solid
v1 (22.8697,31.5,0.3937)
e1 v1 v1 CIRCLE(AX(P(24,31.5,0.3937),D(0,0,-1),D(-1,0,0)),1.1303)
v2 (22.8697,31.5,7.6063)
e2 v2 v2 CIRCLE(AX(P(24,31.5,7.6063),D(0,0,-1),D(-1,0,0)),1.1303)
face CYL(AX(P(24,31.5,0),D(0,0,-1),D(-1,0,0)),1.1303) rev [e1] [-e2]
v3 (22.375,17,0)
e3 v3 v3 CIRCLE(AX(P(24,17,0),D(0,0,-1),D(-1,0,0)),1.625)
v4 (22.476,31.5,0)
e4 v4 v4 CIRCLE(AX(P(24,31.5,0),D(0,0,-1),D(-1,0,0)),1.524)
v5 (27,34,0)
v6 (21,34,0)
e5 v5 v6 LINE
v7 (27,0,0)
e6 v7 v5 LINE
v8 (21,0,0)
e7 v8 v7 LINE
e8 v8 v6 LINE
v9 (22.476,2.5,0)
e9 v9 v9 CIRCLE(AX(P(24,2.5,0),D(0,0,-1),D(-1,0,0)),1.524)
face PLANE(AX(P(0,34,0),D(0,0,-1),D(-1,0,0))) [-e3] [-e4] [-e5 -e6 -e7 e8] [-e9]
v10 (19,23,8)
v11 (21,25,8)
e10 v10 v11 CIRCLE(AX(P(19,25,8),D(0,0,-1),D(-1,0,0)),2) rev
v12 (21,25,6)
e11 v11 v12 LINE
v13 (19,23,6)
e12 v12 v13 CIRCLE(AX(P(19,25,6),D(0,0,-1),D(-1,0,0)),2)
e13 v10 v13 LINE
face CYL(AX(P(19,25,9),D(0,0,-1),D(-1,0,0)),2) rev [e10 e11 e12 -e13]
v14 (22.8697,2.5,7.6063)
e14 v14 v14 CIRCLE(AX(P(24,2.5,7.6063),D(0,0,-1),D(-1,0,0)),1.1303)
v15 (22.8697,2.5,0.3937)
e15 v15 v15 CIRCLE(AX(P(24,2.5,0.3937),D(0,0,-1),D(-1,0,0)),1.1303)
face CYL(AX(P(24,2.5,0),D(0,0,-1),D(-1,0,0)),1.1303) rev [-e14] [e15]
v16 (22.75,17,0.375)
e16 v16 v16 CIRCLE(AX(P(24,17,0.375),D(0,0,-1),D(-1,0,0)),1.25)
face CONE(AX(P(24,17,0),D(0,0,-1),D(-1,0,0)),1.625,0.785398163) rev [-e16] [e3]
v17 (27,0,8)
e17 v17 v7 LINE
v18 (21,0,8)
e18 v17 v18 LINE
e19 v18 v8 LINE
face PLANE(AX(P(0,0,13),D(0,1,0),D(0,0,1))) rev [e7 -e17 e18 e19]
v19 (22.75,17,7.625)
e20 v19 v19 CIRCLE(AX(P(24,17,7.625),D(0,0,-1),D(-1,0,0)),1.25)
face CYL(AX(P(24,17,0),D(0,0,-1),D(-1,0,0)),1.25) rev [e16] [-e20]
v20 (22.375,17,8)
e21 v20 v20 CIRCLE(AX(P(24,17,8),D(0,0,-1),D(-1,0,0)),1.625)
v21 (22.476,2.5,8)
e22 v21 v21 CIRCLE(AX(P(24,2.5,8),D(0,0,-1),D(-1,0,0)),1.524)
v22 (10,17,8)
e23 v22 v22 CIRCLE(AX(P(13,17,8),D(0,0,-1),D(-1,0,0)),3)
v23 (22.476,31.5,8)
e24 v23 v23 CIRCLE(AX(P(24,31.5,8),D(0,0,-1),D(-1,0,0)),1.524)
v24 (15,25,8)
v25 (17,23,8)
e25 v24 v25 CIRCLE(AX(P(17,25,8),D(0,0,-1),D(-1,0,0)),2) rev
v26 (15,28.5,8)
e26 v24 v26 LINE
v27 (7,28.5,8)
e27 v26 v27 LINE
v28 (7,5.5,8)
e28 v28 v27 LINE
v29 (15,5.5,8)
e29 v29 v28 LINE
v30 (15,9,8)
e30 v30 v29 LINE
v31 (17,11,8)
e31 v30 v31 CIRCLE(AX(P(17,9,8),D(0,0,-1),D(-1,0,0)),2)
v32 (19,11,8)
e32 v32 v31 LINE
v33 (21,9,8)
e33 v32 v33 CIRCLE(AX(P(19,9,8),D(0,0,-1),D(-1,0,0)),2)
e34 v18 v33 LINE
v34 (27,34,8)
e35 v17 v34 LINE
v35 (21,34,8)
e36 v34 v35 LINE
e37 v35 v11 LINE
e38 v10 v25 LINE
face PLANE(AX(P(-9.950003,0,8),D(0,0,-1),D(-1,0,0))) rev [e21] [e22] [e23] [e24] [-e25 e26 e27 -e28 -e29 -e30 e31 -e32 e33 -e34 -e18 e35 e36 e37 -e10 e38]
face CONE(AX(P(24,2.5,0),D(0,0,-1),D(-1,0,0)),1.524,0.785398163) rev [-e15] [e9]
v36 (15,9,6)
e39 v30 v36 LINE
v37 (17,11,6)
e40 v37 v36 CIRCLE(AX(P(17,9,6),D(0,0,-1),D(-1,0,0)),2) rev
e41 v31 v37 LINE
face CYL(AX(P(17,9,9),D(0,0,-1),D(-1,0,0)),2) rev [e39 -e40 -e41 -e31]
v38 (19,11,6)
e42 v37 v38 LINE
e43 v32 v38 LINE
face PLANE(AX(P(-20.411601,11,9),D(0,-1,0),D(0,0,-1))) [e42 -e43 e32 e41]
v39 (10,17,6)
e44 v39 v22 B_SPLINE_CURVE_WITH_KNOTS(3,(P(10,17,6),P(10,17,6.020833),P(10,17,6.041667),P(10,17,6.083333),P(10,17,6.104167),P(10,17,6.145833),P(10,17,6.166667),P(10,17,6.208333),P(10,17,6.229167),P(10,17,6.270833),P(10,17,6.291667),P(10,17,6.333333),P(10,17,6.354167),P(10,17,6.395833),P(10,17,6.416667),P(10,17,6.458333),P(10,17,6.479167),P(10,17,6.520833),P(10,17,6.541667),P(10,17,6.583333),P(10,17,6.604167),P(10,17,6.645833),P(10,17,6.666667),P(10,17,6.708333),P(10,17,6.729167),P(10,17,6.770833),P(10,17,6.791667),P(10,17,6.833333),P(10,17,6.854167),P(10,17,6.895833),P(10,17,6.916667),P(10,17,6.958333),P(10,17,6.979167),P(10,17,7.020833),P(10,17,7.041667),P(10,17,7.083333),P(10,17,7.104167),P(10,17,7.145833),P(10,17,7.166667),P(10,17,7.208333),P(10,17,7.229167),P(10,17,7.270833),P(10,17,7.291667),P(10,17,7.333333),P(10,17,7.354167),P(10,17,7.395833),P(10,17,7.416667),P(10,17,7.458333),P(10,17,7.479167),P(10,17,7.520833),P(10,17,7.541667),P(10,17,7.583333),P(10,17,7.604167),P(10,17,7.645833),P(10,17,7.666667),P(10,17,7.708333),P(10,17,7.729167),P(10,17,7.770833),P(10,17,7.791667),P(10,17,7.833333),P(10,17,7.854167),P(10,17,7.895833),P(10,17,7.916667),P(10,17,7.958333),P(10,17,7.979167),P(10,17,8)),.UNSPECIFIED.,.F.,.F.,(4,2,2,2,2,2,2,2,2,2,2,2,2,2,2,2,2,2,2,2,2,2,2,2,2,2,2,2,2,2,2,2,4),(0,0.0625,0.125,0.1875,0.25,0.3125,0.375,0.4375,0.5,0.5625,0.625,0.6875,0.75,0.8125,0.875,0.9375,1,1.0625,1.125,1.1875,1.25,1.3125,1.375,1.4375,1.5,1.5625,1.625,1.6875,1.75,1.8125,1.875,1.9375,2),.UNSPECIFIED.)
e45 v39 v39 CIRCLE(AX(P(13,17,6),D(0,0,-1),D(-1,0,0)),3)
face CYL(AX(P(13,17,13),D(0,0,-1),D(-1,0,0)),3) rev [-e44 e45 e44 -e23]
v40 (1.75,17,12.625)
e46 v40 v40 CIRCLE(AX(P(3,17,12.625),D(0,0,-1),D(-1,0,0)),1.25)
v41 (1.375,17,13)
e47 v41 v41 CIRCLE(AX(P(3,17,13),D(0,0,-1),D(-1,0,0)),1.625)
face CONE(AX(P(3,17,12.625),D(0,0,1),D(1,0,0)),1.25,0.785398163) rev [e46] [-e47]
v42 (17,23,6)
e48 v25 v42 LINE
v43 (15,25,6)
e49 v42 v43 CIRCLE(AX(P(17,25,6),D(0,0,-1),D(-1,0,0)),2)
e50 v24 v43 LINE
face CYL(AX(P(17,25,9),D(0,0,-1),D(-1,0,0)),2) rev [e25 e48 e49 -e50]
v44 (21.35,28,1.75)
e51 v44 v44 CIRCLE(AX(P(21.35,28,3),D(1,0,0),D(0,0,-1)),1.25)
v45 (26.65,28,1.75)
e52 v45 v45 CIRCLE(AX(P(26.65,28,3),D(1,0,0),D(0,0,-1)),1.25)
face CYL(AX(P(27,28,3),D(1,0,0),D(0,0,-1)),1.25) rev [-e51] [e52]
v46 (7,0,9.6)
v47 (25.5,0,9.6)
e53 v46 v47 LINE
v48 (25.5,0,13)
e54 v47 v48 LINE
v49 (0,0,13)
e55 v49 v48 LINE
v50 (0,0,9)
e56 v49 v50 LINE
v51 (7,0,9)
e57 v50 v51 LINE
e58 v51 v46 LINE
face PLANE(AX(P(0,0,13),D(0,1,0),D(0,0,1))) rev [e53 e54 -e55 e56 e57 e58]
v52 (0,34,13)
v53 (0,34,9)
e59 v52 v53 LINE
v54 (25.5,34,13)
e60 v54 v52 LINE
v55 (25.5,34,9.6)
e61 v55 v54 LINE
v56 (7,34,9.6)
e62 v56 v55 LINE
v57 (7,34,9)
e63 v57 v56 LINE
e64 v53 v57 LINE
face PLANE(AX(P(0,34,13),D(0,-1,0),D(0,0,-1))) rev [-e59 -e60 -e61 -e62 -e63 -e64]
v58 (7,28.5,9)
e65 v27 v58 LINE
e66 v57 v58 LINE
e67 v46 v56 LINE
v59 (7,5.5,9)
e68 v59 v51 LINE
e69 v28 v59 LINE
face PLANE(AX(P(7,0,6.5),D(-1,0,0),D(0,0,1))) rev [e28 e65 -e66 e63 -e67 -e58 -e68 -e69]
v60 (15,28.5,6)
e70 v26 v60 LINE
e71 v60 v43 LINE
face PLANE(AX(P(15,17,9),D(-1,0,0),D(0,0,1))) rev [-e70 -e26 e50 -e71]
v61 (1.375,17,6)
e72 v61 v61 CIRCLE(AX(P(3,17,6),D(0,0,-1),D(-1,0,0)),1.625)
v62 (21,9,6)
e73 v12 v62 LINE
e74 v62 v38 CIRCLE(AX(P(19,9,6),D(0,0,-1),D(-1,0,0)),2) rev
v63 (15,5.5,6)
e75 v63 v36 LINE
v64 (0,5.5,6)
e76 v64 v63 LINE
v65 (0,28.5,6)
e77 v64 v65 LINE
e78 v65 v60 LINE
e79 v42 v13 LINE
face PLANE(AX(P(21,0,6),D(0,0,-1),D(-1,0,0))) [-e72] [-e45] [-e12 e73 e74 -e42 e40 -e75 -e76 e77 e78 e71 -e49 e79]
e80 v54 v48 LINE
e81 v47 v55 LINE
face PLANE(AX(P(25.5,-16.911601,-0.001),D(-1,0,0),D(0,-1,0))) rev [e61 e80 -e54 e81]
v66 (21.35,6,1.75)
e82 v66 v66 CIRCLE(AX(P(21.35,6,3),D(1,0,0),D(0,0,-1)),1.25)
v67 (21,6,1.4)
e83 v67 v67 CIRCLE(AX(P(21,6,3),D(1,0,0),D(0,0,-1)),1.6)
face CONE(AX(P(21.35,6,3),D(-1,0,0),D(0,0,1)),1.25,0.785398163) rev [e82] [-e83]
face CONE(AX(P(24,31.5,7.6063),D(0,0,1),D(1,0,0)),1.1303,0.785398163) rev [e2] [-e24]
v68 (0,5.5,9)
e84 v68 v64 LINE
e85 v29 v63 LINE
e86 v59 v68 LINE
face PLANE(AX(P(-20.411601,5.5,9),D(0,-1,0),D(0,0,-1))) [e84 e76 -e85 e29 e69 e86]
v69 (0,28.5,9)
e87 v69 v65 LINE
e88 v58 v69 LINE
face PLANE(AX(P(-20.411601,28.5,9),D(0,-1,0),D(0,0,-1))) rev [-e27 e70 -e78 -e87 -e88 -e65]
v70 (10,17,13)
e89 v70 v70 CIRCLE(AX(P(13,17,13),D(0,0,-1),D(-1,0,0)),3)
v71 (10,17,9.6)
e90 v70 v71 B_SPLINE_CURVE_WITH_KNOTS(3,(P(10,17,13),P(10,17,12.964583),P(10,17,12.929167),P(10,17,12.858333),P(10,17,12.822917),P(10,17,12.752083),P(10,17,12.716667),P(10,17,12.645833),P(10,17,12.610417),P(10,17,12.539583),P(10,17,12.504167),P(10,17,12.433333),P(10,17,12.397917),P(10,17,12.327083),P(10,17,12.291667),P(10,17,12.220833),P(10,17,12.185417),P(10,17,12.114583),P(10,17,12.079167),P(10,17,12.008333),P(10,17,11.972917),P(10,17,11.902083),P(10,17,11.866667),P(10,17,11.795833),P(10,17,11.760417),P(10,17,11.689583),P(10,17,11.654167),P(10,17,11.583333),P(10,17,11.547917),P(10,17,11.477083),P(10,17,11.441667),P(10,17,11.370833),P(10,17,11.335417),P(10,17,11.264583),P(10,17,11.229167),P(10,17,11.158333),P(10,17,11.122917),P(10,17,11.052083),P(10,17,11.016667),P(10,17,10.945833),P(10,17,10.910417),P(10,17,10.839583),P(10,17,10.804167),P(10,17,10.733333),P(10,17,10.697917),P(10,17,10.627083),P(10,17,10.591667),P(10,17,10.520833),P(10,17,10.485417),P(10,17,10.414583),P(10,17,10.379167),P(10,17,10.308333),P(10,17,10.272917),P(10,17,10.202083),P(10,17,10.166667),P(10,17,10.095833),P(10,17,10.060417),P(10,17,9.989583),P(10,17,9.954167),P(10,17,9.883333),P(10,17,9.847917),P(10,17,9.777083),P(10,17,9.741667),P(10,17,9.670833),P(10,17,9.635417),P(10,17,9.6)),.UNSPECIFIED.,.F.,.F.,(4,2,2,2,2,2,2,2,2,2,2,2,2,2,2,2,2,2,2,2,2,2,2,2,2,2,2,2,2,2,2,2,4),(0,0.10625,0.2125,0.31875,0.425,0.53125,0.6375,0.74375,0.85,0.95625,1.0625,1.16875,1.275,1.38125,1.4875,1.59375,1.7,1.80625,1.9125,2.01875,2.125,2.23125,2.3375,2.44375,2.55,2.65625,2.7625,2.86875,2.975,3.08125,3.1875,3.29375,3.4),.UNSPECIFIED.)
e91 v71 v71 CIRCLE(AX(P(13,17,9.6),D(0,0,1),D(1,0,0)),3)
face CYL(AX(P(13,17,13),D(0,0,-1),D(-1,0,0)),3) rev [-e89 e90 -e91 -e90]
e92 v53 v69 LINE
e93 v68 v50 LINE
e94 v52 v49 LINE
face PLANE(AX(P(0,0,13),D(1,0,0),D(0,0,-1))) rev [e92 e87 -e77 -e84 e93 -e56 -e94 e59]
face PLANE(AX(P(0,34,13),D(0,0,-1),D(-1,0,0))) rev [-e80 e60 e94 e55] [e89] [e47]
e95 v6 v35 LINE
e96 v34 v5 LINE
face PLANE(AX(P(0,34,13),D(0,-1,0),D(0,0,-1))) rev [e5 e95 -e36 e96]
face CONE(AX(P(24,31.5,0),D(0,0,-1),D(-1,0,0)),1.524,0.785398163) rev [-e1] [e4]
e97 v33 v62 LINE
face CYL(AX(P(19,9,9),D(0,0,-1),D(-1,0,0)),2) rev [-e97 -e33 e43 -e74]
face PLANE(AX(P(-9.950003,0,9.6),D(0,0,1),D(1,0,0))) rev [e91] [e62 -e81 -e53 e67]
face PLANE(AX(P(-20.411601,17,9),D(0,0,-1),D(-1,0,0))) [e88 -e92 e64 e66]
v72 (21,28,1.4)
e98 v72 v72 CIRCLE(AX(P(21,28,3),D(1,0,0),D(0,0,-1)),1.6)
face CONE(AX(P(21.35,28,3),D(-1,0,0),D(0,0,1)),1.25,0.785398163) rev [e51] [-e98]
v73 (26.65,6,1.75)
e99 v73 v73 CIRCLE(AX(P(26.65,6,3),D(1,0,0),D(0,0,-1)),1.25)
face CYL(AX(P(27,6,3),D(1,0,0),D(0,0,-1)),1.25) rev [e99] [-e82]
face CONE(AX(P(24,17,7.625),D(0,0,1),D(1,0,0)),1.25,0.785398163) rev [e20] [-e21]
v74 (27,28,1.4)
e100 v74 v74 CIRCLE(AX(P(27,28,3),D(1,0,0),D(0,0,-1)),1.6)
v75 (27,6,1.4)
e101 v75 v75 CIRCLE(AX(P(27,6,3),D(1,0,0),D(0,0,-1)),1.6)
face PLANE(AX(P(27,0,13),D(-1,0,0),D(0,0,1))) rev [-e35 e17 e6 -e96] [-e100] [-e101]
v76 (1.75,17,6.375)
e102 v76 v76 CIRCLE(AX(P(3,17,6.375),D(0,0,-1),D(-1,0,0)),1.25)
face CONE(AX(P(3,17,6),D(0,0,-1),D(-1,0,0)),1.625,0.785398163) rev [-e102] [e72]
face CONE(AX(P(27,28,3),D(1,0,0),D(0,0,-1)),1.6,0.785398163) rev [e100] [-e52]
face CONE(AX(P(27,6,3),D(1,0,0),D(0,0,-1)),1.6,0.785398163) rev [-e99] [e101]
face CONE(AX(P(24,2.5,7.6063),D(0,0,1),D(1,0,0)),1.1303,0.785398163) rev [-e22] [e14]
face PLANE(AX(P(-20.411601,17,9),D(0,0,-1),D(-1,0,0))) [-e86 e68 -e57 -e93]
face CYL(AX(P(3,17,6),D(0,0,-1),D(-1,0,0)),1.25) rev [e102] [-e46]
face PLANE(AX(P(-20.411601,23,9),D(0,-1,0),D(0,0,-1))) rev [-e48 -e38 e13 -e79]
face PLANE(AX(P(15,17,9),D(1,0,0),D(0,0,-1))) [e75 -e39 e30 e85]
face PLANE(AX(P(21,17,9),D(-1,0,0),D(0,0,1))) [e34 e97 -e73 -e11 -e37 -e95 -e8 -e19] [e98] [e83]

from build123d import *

# Parameters (mm, degrees)
SKETCH_1_W                   = 27
SKETCH_1_H                   = 34
EXTRUDE_1_DEPTH              = 13
SKETCH_2_W                   = 20
SKETCH_2_H                   = 1.6
CUT_EXTRUDE_1_DEPTH          = 46.321076774
CUT_EXTRUDE_2_DEPTH          = 9
CUT_EXTRUDE_3_REACH          = 47.321
SKETCH_4_W                   = 1.5
SKETCH_4_H                   = 34
SKETCH_12_W                  = 21
SKETCH_12_H                  = 34
CUT_EXTRUDE_7_DEPTH          = 6
SKETCH_8_R                   = 3
CUT_EXTRUDE_4_DEPTH          = 46.321076774
HOLE_WIZARD_M31_AT_2_COUNT   = 2
HOLE_WIZARD_M31_AT_2_PITCH   = 22
HOLE_WIZARD_4_401_AT_2_COUNT = 2
HOLE_WIZARD_4_401_AT_2_PITCH = 29


# Read off the part's stored shape, not the designer's step: Отверстие обработанное метчиком M3x0.52
with BuildPart() as part:
    # Эскиз1 → Вытянуть1 (new body)
    with BuildSketch(Plane.XY):
        with Locations((13.5, 17)):
            Rectangle(SKETCH_1_W, SKETCH_1_H)
    extrude(amount=EXTRUDE_1_DEPTH)

    # Эскиз2 → Вырез-Вытянуть1 (cut, through all)
    with BuildSketch(Plane(origin=(0, 34, 0), x_dir=(1, 0, 0), z_dir=(0, 1, 0))):
        with Locations((17, -8.8)):
            Rectangle(SKETCH_2_W, SKETCH_2_H)
    extrude(amount=-CUT_EXTRUDE_1_DEPTH, mode=Mode.SUBTRACT)

    # Эскиз3 → Вырез-Вытянуть2 (cut)
    with BuildSketch(Plane(origin=(0, 0, 0), x_dir=(-1, 0, 0), z_dir=(0, 0, -1))):
        with BuildLine():
            Line((0, 34), (-21, 34))
            Line((-21, 34), (-21, 25))
            ThreePointArc((-21, 25), (-20.414213562, 23.585786438), (-19, 23))
            Line((-19, 23), (-17, 23))
            ThreePointArc((-17, 23), (-15.585786438, 23.585786438), (-15, 25))
            Line((-15, 25), (-15, 28.5))
            Line((-15, 28.5), (0, 28.5))
            Line((0, 28.5), (0, 34))
        make_face()
        with BuildLine():
            Line((0, 0), (0, 5.5))
            Line((0, 5.5), (-15, 5.5))
            Line((-15, 5.5), (-15, 9))
            ThreePointArc((-15, 9), (-15.585786438, 10.414213562), (-17, 11))
            Line((-17, 11), (-19, 11))
            ThreePointArc((-19, 11), (-20.414213562, 10.414213562), (-21, 9))
            Line((-21, 9), (-21, 0))
            Line((-21, 0), (0, 0))
        make_face()
    extrude(amount=-CUT_EXTRUDE_2_DEPTH, mode=Mode.SUBTRACT)

    # Эскиз4 → Вырез-Вытянуть3 (cut, up to next)
    with BuildSketch(Plane.XY.offset(13), mode=Mode.PRIVATE) as cut_extrude_3_sk1:
        with Locations((26.25, 17)):
            Rectangle(SKETCH_4_W, SKETCH_4_H)
    cut_extrude_3_tool1 = extrude(cut_extrude_3_sk1.sketch, amount=-CUT_EXTRUDE_3_REACH, mode=Mode.PRIVATE) & part.part
    add(cut_extrude_3_tool1.solids().sort_by_distance((26.25, 17, 13))[0], mode=Mode.SUBTRACT)

    # Эскиз12 → Вырез-Вытянуть7 (cut)
    with BuildSketch(Plane(origin=(0, 0, 0), x_dir=(-1, 0, 0), z_dir=(0, 0, -1))):
        with Locations((-10.5, 17)):
            Rectangle(SKETCH_12_W, SKETCH_12_H)
    extrude(amount=-CUT_EXTRUDE_7_DEPTH, mode=Mode.SUBTRACT)

    # Эскиз8 → Вырез-Вытянуть4 (cut, through all)
    with BuildSketch(Plane(origin=(0, 0, 0), x_dir=(-1, 0, 0), z_dir=(0, 0, -1))):
        with Locations((-13, 17)):
            Circle(SKETCH_8_R)
    extrude(amount=-CUT_EXTRUDE_4_DEPTH, mode=Mode.SUBTRACT)

    # Эскиз19 → Отверстие обработанное метчиком M31 (revolve, cut)
    with BuildSketch(Plane(origin=(27, 28, 3), x_dir=(0, 0, -1), z_dir=(0, 1, 0))):
        Polygon((0, 0), (0, 6), (1.6, 6), (1.25, 5.65), (1.25, 0.35), (1.6, 0), align=None)
    hole_wizard_m31 = revolve(axis=Axis((33.35, 28, 3), (-1, 0, 0)), mode=Mode.SUBTRACT)

    # Отверстие обработанное метчиком M31 at 2: Отверстие обработанное метчиком M31 ×2
    with Locations(*[(0, -i * HOLE_WIZARD_M31_AT_2_PITCH, 0) for i in range(1, HOLE_WIZARD_M31_AT_2_COUNT)]):
        add(hole_wizard_m31, mode=Mode.SUBTRACT)

    # Отверстие обработанное метчиком M3x0.52 outline → Отверстие обработанное метчиком M3x0.52 (revolve, cut)
    with BuildSketch(Plane(origin=(24, 17, 0), x_dir=(1, 0, 0), z_dir=(0, -1, 0))):
        Polygon((1.625, 8), (0, 8), (0, 0), (1.625, 0), (1.25, 0.375), (1.25, 7.625), align=None)
    revolve(axis=Axis((24, 17, 0), (0, 0, 1)), mode=Mode.SUBTRACT)

    # M3x0.52 2 outline → M3x0.52 2 (revolve, cut)
    with BuildSketch(Plane(origin=(3, 17, 0), x_dir=(1, 0, 0), z_dir=(0, -1, 0))):
        Polygon((1.625, 13), (0, 13), (0, 6), (1.625, 6), (1.25, 6.375), (1.25, 12.625), align=None)
    revolve(axis=Axis((3, 17, 0), (0, 0, 1)), mode=Mode.SUBTRACT)

    # Эскиз24 → Отверстие обработанное метчиком #4-401 (revolve, cut)
    with BuildSketch(Plane(origin=(24, 2.5, 0), x_dir=(0, 1, 0), z_dir=(1, 0, 0))):
        Polygon((0, 0), (0, 8), (1.524, 8), (1.1303, 7.6063), (1.1303, 0.3937), (1.524, 0), align=None)
    hole_wizard_4_401 = revolve(axis=Axis((24, 2.5, -6.35), (0, 0, 1)), mode=Mode.SUBTRACT)

    # Отверстие обработанное метчиком #4-401 at 2: Отверстие обработанное метчиком #4-401 ×2
    with Locations(*[(0, i * HOLE_WIZARD_4_401_AT_2_PITCH, 0) for i in range(1, HOLE_WIZARD_4_401_AT_2_COUNT)]):
        add(hole_wizard_4_401, mode=Mode.SUBTRACT)


solid = part.part
